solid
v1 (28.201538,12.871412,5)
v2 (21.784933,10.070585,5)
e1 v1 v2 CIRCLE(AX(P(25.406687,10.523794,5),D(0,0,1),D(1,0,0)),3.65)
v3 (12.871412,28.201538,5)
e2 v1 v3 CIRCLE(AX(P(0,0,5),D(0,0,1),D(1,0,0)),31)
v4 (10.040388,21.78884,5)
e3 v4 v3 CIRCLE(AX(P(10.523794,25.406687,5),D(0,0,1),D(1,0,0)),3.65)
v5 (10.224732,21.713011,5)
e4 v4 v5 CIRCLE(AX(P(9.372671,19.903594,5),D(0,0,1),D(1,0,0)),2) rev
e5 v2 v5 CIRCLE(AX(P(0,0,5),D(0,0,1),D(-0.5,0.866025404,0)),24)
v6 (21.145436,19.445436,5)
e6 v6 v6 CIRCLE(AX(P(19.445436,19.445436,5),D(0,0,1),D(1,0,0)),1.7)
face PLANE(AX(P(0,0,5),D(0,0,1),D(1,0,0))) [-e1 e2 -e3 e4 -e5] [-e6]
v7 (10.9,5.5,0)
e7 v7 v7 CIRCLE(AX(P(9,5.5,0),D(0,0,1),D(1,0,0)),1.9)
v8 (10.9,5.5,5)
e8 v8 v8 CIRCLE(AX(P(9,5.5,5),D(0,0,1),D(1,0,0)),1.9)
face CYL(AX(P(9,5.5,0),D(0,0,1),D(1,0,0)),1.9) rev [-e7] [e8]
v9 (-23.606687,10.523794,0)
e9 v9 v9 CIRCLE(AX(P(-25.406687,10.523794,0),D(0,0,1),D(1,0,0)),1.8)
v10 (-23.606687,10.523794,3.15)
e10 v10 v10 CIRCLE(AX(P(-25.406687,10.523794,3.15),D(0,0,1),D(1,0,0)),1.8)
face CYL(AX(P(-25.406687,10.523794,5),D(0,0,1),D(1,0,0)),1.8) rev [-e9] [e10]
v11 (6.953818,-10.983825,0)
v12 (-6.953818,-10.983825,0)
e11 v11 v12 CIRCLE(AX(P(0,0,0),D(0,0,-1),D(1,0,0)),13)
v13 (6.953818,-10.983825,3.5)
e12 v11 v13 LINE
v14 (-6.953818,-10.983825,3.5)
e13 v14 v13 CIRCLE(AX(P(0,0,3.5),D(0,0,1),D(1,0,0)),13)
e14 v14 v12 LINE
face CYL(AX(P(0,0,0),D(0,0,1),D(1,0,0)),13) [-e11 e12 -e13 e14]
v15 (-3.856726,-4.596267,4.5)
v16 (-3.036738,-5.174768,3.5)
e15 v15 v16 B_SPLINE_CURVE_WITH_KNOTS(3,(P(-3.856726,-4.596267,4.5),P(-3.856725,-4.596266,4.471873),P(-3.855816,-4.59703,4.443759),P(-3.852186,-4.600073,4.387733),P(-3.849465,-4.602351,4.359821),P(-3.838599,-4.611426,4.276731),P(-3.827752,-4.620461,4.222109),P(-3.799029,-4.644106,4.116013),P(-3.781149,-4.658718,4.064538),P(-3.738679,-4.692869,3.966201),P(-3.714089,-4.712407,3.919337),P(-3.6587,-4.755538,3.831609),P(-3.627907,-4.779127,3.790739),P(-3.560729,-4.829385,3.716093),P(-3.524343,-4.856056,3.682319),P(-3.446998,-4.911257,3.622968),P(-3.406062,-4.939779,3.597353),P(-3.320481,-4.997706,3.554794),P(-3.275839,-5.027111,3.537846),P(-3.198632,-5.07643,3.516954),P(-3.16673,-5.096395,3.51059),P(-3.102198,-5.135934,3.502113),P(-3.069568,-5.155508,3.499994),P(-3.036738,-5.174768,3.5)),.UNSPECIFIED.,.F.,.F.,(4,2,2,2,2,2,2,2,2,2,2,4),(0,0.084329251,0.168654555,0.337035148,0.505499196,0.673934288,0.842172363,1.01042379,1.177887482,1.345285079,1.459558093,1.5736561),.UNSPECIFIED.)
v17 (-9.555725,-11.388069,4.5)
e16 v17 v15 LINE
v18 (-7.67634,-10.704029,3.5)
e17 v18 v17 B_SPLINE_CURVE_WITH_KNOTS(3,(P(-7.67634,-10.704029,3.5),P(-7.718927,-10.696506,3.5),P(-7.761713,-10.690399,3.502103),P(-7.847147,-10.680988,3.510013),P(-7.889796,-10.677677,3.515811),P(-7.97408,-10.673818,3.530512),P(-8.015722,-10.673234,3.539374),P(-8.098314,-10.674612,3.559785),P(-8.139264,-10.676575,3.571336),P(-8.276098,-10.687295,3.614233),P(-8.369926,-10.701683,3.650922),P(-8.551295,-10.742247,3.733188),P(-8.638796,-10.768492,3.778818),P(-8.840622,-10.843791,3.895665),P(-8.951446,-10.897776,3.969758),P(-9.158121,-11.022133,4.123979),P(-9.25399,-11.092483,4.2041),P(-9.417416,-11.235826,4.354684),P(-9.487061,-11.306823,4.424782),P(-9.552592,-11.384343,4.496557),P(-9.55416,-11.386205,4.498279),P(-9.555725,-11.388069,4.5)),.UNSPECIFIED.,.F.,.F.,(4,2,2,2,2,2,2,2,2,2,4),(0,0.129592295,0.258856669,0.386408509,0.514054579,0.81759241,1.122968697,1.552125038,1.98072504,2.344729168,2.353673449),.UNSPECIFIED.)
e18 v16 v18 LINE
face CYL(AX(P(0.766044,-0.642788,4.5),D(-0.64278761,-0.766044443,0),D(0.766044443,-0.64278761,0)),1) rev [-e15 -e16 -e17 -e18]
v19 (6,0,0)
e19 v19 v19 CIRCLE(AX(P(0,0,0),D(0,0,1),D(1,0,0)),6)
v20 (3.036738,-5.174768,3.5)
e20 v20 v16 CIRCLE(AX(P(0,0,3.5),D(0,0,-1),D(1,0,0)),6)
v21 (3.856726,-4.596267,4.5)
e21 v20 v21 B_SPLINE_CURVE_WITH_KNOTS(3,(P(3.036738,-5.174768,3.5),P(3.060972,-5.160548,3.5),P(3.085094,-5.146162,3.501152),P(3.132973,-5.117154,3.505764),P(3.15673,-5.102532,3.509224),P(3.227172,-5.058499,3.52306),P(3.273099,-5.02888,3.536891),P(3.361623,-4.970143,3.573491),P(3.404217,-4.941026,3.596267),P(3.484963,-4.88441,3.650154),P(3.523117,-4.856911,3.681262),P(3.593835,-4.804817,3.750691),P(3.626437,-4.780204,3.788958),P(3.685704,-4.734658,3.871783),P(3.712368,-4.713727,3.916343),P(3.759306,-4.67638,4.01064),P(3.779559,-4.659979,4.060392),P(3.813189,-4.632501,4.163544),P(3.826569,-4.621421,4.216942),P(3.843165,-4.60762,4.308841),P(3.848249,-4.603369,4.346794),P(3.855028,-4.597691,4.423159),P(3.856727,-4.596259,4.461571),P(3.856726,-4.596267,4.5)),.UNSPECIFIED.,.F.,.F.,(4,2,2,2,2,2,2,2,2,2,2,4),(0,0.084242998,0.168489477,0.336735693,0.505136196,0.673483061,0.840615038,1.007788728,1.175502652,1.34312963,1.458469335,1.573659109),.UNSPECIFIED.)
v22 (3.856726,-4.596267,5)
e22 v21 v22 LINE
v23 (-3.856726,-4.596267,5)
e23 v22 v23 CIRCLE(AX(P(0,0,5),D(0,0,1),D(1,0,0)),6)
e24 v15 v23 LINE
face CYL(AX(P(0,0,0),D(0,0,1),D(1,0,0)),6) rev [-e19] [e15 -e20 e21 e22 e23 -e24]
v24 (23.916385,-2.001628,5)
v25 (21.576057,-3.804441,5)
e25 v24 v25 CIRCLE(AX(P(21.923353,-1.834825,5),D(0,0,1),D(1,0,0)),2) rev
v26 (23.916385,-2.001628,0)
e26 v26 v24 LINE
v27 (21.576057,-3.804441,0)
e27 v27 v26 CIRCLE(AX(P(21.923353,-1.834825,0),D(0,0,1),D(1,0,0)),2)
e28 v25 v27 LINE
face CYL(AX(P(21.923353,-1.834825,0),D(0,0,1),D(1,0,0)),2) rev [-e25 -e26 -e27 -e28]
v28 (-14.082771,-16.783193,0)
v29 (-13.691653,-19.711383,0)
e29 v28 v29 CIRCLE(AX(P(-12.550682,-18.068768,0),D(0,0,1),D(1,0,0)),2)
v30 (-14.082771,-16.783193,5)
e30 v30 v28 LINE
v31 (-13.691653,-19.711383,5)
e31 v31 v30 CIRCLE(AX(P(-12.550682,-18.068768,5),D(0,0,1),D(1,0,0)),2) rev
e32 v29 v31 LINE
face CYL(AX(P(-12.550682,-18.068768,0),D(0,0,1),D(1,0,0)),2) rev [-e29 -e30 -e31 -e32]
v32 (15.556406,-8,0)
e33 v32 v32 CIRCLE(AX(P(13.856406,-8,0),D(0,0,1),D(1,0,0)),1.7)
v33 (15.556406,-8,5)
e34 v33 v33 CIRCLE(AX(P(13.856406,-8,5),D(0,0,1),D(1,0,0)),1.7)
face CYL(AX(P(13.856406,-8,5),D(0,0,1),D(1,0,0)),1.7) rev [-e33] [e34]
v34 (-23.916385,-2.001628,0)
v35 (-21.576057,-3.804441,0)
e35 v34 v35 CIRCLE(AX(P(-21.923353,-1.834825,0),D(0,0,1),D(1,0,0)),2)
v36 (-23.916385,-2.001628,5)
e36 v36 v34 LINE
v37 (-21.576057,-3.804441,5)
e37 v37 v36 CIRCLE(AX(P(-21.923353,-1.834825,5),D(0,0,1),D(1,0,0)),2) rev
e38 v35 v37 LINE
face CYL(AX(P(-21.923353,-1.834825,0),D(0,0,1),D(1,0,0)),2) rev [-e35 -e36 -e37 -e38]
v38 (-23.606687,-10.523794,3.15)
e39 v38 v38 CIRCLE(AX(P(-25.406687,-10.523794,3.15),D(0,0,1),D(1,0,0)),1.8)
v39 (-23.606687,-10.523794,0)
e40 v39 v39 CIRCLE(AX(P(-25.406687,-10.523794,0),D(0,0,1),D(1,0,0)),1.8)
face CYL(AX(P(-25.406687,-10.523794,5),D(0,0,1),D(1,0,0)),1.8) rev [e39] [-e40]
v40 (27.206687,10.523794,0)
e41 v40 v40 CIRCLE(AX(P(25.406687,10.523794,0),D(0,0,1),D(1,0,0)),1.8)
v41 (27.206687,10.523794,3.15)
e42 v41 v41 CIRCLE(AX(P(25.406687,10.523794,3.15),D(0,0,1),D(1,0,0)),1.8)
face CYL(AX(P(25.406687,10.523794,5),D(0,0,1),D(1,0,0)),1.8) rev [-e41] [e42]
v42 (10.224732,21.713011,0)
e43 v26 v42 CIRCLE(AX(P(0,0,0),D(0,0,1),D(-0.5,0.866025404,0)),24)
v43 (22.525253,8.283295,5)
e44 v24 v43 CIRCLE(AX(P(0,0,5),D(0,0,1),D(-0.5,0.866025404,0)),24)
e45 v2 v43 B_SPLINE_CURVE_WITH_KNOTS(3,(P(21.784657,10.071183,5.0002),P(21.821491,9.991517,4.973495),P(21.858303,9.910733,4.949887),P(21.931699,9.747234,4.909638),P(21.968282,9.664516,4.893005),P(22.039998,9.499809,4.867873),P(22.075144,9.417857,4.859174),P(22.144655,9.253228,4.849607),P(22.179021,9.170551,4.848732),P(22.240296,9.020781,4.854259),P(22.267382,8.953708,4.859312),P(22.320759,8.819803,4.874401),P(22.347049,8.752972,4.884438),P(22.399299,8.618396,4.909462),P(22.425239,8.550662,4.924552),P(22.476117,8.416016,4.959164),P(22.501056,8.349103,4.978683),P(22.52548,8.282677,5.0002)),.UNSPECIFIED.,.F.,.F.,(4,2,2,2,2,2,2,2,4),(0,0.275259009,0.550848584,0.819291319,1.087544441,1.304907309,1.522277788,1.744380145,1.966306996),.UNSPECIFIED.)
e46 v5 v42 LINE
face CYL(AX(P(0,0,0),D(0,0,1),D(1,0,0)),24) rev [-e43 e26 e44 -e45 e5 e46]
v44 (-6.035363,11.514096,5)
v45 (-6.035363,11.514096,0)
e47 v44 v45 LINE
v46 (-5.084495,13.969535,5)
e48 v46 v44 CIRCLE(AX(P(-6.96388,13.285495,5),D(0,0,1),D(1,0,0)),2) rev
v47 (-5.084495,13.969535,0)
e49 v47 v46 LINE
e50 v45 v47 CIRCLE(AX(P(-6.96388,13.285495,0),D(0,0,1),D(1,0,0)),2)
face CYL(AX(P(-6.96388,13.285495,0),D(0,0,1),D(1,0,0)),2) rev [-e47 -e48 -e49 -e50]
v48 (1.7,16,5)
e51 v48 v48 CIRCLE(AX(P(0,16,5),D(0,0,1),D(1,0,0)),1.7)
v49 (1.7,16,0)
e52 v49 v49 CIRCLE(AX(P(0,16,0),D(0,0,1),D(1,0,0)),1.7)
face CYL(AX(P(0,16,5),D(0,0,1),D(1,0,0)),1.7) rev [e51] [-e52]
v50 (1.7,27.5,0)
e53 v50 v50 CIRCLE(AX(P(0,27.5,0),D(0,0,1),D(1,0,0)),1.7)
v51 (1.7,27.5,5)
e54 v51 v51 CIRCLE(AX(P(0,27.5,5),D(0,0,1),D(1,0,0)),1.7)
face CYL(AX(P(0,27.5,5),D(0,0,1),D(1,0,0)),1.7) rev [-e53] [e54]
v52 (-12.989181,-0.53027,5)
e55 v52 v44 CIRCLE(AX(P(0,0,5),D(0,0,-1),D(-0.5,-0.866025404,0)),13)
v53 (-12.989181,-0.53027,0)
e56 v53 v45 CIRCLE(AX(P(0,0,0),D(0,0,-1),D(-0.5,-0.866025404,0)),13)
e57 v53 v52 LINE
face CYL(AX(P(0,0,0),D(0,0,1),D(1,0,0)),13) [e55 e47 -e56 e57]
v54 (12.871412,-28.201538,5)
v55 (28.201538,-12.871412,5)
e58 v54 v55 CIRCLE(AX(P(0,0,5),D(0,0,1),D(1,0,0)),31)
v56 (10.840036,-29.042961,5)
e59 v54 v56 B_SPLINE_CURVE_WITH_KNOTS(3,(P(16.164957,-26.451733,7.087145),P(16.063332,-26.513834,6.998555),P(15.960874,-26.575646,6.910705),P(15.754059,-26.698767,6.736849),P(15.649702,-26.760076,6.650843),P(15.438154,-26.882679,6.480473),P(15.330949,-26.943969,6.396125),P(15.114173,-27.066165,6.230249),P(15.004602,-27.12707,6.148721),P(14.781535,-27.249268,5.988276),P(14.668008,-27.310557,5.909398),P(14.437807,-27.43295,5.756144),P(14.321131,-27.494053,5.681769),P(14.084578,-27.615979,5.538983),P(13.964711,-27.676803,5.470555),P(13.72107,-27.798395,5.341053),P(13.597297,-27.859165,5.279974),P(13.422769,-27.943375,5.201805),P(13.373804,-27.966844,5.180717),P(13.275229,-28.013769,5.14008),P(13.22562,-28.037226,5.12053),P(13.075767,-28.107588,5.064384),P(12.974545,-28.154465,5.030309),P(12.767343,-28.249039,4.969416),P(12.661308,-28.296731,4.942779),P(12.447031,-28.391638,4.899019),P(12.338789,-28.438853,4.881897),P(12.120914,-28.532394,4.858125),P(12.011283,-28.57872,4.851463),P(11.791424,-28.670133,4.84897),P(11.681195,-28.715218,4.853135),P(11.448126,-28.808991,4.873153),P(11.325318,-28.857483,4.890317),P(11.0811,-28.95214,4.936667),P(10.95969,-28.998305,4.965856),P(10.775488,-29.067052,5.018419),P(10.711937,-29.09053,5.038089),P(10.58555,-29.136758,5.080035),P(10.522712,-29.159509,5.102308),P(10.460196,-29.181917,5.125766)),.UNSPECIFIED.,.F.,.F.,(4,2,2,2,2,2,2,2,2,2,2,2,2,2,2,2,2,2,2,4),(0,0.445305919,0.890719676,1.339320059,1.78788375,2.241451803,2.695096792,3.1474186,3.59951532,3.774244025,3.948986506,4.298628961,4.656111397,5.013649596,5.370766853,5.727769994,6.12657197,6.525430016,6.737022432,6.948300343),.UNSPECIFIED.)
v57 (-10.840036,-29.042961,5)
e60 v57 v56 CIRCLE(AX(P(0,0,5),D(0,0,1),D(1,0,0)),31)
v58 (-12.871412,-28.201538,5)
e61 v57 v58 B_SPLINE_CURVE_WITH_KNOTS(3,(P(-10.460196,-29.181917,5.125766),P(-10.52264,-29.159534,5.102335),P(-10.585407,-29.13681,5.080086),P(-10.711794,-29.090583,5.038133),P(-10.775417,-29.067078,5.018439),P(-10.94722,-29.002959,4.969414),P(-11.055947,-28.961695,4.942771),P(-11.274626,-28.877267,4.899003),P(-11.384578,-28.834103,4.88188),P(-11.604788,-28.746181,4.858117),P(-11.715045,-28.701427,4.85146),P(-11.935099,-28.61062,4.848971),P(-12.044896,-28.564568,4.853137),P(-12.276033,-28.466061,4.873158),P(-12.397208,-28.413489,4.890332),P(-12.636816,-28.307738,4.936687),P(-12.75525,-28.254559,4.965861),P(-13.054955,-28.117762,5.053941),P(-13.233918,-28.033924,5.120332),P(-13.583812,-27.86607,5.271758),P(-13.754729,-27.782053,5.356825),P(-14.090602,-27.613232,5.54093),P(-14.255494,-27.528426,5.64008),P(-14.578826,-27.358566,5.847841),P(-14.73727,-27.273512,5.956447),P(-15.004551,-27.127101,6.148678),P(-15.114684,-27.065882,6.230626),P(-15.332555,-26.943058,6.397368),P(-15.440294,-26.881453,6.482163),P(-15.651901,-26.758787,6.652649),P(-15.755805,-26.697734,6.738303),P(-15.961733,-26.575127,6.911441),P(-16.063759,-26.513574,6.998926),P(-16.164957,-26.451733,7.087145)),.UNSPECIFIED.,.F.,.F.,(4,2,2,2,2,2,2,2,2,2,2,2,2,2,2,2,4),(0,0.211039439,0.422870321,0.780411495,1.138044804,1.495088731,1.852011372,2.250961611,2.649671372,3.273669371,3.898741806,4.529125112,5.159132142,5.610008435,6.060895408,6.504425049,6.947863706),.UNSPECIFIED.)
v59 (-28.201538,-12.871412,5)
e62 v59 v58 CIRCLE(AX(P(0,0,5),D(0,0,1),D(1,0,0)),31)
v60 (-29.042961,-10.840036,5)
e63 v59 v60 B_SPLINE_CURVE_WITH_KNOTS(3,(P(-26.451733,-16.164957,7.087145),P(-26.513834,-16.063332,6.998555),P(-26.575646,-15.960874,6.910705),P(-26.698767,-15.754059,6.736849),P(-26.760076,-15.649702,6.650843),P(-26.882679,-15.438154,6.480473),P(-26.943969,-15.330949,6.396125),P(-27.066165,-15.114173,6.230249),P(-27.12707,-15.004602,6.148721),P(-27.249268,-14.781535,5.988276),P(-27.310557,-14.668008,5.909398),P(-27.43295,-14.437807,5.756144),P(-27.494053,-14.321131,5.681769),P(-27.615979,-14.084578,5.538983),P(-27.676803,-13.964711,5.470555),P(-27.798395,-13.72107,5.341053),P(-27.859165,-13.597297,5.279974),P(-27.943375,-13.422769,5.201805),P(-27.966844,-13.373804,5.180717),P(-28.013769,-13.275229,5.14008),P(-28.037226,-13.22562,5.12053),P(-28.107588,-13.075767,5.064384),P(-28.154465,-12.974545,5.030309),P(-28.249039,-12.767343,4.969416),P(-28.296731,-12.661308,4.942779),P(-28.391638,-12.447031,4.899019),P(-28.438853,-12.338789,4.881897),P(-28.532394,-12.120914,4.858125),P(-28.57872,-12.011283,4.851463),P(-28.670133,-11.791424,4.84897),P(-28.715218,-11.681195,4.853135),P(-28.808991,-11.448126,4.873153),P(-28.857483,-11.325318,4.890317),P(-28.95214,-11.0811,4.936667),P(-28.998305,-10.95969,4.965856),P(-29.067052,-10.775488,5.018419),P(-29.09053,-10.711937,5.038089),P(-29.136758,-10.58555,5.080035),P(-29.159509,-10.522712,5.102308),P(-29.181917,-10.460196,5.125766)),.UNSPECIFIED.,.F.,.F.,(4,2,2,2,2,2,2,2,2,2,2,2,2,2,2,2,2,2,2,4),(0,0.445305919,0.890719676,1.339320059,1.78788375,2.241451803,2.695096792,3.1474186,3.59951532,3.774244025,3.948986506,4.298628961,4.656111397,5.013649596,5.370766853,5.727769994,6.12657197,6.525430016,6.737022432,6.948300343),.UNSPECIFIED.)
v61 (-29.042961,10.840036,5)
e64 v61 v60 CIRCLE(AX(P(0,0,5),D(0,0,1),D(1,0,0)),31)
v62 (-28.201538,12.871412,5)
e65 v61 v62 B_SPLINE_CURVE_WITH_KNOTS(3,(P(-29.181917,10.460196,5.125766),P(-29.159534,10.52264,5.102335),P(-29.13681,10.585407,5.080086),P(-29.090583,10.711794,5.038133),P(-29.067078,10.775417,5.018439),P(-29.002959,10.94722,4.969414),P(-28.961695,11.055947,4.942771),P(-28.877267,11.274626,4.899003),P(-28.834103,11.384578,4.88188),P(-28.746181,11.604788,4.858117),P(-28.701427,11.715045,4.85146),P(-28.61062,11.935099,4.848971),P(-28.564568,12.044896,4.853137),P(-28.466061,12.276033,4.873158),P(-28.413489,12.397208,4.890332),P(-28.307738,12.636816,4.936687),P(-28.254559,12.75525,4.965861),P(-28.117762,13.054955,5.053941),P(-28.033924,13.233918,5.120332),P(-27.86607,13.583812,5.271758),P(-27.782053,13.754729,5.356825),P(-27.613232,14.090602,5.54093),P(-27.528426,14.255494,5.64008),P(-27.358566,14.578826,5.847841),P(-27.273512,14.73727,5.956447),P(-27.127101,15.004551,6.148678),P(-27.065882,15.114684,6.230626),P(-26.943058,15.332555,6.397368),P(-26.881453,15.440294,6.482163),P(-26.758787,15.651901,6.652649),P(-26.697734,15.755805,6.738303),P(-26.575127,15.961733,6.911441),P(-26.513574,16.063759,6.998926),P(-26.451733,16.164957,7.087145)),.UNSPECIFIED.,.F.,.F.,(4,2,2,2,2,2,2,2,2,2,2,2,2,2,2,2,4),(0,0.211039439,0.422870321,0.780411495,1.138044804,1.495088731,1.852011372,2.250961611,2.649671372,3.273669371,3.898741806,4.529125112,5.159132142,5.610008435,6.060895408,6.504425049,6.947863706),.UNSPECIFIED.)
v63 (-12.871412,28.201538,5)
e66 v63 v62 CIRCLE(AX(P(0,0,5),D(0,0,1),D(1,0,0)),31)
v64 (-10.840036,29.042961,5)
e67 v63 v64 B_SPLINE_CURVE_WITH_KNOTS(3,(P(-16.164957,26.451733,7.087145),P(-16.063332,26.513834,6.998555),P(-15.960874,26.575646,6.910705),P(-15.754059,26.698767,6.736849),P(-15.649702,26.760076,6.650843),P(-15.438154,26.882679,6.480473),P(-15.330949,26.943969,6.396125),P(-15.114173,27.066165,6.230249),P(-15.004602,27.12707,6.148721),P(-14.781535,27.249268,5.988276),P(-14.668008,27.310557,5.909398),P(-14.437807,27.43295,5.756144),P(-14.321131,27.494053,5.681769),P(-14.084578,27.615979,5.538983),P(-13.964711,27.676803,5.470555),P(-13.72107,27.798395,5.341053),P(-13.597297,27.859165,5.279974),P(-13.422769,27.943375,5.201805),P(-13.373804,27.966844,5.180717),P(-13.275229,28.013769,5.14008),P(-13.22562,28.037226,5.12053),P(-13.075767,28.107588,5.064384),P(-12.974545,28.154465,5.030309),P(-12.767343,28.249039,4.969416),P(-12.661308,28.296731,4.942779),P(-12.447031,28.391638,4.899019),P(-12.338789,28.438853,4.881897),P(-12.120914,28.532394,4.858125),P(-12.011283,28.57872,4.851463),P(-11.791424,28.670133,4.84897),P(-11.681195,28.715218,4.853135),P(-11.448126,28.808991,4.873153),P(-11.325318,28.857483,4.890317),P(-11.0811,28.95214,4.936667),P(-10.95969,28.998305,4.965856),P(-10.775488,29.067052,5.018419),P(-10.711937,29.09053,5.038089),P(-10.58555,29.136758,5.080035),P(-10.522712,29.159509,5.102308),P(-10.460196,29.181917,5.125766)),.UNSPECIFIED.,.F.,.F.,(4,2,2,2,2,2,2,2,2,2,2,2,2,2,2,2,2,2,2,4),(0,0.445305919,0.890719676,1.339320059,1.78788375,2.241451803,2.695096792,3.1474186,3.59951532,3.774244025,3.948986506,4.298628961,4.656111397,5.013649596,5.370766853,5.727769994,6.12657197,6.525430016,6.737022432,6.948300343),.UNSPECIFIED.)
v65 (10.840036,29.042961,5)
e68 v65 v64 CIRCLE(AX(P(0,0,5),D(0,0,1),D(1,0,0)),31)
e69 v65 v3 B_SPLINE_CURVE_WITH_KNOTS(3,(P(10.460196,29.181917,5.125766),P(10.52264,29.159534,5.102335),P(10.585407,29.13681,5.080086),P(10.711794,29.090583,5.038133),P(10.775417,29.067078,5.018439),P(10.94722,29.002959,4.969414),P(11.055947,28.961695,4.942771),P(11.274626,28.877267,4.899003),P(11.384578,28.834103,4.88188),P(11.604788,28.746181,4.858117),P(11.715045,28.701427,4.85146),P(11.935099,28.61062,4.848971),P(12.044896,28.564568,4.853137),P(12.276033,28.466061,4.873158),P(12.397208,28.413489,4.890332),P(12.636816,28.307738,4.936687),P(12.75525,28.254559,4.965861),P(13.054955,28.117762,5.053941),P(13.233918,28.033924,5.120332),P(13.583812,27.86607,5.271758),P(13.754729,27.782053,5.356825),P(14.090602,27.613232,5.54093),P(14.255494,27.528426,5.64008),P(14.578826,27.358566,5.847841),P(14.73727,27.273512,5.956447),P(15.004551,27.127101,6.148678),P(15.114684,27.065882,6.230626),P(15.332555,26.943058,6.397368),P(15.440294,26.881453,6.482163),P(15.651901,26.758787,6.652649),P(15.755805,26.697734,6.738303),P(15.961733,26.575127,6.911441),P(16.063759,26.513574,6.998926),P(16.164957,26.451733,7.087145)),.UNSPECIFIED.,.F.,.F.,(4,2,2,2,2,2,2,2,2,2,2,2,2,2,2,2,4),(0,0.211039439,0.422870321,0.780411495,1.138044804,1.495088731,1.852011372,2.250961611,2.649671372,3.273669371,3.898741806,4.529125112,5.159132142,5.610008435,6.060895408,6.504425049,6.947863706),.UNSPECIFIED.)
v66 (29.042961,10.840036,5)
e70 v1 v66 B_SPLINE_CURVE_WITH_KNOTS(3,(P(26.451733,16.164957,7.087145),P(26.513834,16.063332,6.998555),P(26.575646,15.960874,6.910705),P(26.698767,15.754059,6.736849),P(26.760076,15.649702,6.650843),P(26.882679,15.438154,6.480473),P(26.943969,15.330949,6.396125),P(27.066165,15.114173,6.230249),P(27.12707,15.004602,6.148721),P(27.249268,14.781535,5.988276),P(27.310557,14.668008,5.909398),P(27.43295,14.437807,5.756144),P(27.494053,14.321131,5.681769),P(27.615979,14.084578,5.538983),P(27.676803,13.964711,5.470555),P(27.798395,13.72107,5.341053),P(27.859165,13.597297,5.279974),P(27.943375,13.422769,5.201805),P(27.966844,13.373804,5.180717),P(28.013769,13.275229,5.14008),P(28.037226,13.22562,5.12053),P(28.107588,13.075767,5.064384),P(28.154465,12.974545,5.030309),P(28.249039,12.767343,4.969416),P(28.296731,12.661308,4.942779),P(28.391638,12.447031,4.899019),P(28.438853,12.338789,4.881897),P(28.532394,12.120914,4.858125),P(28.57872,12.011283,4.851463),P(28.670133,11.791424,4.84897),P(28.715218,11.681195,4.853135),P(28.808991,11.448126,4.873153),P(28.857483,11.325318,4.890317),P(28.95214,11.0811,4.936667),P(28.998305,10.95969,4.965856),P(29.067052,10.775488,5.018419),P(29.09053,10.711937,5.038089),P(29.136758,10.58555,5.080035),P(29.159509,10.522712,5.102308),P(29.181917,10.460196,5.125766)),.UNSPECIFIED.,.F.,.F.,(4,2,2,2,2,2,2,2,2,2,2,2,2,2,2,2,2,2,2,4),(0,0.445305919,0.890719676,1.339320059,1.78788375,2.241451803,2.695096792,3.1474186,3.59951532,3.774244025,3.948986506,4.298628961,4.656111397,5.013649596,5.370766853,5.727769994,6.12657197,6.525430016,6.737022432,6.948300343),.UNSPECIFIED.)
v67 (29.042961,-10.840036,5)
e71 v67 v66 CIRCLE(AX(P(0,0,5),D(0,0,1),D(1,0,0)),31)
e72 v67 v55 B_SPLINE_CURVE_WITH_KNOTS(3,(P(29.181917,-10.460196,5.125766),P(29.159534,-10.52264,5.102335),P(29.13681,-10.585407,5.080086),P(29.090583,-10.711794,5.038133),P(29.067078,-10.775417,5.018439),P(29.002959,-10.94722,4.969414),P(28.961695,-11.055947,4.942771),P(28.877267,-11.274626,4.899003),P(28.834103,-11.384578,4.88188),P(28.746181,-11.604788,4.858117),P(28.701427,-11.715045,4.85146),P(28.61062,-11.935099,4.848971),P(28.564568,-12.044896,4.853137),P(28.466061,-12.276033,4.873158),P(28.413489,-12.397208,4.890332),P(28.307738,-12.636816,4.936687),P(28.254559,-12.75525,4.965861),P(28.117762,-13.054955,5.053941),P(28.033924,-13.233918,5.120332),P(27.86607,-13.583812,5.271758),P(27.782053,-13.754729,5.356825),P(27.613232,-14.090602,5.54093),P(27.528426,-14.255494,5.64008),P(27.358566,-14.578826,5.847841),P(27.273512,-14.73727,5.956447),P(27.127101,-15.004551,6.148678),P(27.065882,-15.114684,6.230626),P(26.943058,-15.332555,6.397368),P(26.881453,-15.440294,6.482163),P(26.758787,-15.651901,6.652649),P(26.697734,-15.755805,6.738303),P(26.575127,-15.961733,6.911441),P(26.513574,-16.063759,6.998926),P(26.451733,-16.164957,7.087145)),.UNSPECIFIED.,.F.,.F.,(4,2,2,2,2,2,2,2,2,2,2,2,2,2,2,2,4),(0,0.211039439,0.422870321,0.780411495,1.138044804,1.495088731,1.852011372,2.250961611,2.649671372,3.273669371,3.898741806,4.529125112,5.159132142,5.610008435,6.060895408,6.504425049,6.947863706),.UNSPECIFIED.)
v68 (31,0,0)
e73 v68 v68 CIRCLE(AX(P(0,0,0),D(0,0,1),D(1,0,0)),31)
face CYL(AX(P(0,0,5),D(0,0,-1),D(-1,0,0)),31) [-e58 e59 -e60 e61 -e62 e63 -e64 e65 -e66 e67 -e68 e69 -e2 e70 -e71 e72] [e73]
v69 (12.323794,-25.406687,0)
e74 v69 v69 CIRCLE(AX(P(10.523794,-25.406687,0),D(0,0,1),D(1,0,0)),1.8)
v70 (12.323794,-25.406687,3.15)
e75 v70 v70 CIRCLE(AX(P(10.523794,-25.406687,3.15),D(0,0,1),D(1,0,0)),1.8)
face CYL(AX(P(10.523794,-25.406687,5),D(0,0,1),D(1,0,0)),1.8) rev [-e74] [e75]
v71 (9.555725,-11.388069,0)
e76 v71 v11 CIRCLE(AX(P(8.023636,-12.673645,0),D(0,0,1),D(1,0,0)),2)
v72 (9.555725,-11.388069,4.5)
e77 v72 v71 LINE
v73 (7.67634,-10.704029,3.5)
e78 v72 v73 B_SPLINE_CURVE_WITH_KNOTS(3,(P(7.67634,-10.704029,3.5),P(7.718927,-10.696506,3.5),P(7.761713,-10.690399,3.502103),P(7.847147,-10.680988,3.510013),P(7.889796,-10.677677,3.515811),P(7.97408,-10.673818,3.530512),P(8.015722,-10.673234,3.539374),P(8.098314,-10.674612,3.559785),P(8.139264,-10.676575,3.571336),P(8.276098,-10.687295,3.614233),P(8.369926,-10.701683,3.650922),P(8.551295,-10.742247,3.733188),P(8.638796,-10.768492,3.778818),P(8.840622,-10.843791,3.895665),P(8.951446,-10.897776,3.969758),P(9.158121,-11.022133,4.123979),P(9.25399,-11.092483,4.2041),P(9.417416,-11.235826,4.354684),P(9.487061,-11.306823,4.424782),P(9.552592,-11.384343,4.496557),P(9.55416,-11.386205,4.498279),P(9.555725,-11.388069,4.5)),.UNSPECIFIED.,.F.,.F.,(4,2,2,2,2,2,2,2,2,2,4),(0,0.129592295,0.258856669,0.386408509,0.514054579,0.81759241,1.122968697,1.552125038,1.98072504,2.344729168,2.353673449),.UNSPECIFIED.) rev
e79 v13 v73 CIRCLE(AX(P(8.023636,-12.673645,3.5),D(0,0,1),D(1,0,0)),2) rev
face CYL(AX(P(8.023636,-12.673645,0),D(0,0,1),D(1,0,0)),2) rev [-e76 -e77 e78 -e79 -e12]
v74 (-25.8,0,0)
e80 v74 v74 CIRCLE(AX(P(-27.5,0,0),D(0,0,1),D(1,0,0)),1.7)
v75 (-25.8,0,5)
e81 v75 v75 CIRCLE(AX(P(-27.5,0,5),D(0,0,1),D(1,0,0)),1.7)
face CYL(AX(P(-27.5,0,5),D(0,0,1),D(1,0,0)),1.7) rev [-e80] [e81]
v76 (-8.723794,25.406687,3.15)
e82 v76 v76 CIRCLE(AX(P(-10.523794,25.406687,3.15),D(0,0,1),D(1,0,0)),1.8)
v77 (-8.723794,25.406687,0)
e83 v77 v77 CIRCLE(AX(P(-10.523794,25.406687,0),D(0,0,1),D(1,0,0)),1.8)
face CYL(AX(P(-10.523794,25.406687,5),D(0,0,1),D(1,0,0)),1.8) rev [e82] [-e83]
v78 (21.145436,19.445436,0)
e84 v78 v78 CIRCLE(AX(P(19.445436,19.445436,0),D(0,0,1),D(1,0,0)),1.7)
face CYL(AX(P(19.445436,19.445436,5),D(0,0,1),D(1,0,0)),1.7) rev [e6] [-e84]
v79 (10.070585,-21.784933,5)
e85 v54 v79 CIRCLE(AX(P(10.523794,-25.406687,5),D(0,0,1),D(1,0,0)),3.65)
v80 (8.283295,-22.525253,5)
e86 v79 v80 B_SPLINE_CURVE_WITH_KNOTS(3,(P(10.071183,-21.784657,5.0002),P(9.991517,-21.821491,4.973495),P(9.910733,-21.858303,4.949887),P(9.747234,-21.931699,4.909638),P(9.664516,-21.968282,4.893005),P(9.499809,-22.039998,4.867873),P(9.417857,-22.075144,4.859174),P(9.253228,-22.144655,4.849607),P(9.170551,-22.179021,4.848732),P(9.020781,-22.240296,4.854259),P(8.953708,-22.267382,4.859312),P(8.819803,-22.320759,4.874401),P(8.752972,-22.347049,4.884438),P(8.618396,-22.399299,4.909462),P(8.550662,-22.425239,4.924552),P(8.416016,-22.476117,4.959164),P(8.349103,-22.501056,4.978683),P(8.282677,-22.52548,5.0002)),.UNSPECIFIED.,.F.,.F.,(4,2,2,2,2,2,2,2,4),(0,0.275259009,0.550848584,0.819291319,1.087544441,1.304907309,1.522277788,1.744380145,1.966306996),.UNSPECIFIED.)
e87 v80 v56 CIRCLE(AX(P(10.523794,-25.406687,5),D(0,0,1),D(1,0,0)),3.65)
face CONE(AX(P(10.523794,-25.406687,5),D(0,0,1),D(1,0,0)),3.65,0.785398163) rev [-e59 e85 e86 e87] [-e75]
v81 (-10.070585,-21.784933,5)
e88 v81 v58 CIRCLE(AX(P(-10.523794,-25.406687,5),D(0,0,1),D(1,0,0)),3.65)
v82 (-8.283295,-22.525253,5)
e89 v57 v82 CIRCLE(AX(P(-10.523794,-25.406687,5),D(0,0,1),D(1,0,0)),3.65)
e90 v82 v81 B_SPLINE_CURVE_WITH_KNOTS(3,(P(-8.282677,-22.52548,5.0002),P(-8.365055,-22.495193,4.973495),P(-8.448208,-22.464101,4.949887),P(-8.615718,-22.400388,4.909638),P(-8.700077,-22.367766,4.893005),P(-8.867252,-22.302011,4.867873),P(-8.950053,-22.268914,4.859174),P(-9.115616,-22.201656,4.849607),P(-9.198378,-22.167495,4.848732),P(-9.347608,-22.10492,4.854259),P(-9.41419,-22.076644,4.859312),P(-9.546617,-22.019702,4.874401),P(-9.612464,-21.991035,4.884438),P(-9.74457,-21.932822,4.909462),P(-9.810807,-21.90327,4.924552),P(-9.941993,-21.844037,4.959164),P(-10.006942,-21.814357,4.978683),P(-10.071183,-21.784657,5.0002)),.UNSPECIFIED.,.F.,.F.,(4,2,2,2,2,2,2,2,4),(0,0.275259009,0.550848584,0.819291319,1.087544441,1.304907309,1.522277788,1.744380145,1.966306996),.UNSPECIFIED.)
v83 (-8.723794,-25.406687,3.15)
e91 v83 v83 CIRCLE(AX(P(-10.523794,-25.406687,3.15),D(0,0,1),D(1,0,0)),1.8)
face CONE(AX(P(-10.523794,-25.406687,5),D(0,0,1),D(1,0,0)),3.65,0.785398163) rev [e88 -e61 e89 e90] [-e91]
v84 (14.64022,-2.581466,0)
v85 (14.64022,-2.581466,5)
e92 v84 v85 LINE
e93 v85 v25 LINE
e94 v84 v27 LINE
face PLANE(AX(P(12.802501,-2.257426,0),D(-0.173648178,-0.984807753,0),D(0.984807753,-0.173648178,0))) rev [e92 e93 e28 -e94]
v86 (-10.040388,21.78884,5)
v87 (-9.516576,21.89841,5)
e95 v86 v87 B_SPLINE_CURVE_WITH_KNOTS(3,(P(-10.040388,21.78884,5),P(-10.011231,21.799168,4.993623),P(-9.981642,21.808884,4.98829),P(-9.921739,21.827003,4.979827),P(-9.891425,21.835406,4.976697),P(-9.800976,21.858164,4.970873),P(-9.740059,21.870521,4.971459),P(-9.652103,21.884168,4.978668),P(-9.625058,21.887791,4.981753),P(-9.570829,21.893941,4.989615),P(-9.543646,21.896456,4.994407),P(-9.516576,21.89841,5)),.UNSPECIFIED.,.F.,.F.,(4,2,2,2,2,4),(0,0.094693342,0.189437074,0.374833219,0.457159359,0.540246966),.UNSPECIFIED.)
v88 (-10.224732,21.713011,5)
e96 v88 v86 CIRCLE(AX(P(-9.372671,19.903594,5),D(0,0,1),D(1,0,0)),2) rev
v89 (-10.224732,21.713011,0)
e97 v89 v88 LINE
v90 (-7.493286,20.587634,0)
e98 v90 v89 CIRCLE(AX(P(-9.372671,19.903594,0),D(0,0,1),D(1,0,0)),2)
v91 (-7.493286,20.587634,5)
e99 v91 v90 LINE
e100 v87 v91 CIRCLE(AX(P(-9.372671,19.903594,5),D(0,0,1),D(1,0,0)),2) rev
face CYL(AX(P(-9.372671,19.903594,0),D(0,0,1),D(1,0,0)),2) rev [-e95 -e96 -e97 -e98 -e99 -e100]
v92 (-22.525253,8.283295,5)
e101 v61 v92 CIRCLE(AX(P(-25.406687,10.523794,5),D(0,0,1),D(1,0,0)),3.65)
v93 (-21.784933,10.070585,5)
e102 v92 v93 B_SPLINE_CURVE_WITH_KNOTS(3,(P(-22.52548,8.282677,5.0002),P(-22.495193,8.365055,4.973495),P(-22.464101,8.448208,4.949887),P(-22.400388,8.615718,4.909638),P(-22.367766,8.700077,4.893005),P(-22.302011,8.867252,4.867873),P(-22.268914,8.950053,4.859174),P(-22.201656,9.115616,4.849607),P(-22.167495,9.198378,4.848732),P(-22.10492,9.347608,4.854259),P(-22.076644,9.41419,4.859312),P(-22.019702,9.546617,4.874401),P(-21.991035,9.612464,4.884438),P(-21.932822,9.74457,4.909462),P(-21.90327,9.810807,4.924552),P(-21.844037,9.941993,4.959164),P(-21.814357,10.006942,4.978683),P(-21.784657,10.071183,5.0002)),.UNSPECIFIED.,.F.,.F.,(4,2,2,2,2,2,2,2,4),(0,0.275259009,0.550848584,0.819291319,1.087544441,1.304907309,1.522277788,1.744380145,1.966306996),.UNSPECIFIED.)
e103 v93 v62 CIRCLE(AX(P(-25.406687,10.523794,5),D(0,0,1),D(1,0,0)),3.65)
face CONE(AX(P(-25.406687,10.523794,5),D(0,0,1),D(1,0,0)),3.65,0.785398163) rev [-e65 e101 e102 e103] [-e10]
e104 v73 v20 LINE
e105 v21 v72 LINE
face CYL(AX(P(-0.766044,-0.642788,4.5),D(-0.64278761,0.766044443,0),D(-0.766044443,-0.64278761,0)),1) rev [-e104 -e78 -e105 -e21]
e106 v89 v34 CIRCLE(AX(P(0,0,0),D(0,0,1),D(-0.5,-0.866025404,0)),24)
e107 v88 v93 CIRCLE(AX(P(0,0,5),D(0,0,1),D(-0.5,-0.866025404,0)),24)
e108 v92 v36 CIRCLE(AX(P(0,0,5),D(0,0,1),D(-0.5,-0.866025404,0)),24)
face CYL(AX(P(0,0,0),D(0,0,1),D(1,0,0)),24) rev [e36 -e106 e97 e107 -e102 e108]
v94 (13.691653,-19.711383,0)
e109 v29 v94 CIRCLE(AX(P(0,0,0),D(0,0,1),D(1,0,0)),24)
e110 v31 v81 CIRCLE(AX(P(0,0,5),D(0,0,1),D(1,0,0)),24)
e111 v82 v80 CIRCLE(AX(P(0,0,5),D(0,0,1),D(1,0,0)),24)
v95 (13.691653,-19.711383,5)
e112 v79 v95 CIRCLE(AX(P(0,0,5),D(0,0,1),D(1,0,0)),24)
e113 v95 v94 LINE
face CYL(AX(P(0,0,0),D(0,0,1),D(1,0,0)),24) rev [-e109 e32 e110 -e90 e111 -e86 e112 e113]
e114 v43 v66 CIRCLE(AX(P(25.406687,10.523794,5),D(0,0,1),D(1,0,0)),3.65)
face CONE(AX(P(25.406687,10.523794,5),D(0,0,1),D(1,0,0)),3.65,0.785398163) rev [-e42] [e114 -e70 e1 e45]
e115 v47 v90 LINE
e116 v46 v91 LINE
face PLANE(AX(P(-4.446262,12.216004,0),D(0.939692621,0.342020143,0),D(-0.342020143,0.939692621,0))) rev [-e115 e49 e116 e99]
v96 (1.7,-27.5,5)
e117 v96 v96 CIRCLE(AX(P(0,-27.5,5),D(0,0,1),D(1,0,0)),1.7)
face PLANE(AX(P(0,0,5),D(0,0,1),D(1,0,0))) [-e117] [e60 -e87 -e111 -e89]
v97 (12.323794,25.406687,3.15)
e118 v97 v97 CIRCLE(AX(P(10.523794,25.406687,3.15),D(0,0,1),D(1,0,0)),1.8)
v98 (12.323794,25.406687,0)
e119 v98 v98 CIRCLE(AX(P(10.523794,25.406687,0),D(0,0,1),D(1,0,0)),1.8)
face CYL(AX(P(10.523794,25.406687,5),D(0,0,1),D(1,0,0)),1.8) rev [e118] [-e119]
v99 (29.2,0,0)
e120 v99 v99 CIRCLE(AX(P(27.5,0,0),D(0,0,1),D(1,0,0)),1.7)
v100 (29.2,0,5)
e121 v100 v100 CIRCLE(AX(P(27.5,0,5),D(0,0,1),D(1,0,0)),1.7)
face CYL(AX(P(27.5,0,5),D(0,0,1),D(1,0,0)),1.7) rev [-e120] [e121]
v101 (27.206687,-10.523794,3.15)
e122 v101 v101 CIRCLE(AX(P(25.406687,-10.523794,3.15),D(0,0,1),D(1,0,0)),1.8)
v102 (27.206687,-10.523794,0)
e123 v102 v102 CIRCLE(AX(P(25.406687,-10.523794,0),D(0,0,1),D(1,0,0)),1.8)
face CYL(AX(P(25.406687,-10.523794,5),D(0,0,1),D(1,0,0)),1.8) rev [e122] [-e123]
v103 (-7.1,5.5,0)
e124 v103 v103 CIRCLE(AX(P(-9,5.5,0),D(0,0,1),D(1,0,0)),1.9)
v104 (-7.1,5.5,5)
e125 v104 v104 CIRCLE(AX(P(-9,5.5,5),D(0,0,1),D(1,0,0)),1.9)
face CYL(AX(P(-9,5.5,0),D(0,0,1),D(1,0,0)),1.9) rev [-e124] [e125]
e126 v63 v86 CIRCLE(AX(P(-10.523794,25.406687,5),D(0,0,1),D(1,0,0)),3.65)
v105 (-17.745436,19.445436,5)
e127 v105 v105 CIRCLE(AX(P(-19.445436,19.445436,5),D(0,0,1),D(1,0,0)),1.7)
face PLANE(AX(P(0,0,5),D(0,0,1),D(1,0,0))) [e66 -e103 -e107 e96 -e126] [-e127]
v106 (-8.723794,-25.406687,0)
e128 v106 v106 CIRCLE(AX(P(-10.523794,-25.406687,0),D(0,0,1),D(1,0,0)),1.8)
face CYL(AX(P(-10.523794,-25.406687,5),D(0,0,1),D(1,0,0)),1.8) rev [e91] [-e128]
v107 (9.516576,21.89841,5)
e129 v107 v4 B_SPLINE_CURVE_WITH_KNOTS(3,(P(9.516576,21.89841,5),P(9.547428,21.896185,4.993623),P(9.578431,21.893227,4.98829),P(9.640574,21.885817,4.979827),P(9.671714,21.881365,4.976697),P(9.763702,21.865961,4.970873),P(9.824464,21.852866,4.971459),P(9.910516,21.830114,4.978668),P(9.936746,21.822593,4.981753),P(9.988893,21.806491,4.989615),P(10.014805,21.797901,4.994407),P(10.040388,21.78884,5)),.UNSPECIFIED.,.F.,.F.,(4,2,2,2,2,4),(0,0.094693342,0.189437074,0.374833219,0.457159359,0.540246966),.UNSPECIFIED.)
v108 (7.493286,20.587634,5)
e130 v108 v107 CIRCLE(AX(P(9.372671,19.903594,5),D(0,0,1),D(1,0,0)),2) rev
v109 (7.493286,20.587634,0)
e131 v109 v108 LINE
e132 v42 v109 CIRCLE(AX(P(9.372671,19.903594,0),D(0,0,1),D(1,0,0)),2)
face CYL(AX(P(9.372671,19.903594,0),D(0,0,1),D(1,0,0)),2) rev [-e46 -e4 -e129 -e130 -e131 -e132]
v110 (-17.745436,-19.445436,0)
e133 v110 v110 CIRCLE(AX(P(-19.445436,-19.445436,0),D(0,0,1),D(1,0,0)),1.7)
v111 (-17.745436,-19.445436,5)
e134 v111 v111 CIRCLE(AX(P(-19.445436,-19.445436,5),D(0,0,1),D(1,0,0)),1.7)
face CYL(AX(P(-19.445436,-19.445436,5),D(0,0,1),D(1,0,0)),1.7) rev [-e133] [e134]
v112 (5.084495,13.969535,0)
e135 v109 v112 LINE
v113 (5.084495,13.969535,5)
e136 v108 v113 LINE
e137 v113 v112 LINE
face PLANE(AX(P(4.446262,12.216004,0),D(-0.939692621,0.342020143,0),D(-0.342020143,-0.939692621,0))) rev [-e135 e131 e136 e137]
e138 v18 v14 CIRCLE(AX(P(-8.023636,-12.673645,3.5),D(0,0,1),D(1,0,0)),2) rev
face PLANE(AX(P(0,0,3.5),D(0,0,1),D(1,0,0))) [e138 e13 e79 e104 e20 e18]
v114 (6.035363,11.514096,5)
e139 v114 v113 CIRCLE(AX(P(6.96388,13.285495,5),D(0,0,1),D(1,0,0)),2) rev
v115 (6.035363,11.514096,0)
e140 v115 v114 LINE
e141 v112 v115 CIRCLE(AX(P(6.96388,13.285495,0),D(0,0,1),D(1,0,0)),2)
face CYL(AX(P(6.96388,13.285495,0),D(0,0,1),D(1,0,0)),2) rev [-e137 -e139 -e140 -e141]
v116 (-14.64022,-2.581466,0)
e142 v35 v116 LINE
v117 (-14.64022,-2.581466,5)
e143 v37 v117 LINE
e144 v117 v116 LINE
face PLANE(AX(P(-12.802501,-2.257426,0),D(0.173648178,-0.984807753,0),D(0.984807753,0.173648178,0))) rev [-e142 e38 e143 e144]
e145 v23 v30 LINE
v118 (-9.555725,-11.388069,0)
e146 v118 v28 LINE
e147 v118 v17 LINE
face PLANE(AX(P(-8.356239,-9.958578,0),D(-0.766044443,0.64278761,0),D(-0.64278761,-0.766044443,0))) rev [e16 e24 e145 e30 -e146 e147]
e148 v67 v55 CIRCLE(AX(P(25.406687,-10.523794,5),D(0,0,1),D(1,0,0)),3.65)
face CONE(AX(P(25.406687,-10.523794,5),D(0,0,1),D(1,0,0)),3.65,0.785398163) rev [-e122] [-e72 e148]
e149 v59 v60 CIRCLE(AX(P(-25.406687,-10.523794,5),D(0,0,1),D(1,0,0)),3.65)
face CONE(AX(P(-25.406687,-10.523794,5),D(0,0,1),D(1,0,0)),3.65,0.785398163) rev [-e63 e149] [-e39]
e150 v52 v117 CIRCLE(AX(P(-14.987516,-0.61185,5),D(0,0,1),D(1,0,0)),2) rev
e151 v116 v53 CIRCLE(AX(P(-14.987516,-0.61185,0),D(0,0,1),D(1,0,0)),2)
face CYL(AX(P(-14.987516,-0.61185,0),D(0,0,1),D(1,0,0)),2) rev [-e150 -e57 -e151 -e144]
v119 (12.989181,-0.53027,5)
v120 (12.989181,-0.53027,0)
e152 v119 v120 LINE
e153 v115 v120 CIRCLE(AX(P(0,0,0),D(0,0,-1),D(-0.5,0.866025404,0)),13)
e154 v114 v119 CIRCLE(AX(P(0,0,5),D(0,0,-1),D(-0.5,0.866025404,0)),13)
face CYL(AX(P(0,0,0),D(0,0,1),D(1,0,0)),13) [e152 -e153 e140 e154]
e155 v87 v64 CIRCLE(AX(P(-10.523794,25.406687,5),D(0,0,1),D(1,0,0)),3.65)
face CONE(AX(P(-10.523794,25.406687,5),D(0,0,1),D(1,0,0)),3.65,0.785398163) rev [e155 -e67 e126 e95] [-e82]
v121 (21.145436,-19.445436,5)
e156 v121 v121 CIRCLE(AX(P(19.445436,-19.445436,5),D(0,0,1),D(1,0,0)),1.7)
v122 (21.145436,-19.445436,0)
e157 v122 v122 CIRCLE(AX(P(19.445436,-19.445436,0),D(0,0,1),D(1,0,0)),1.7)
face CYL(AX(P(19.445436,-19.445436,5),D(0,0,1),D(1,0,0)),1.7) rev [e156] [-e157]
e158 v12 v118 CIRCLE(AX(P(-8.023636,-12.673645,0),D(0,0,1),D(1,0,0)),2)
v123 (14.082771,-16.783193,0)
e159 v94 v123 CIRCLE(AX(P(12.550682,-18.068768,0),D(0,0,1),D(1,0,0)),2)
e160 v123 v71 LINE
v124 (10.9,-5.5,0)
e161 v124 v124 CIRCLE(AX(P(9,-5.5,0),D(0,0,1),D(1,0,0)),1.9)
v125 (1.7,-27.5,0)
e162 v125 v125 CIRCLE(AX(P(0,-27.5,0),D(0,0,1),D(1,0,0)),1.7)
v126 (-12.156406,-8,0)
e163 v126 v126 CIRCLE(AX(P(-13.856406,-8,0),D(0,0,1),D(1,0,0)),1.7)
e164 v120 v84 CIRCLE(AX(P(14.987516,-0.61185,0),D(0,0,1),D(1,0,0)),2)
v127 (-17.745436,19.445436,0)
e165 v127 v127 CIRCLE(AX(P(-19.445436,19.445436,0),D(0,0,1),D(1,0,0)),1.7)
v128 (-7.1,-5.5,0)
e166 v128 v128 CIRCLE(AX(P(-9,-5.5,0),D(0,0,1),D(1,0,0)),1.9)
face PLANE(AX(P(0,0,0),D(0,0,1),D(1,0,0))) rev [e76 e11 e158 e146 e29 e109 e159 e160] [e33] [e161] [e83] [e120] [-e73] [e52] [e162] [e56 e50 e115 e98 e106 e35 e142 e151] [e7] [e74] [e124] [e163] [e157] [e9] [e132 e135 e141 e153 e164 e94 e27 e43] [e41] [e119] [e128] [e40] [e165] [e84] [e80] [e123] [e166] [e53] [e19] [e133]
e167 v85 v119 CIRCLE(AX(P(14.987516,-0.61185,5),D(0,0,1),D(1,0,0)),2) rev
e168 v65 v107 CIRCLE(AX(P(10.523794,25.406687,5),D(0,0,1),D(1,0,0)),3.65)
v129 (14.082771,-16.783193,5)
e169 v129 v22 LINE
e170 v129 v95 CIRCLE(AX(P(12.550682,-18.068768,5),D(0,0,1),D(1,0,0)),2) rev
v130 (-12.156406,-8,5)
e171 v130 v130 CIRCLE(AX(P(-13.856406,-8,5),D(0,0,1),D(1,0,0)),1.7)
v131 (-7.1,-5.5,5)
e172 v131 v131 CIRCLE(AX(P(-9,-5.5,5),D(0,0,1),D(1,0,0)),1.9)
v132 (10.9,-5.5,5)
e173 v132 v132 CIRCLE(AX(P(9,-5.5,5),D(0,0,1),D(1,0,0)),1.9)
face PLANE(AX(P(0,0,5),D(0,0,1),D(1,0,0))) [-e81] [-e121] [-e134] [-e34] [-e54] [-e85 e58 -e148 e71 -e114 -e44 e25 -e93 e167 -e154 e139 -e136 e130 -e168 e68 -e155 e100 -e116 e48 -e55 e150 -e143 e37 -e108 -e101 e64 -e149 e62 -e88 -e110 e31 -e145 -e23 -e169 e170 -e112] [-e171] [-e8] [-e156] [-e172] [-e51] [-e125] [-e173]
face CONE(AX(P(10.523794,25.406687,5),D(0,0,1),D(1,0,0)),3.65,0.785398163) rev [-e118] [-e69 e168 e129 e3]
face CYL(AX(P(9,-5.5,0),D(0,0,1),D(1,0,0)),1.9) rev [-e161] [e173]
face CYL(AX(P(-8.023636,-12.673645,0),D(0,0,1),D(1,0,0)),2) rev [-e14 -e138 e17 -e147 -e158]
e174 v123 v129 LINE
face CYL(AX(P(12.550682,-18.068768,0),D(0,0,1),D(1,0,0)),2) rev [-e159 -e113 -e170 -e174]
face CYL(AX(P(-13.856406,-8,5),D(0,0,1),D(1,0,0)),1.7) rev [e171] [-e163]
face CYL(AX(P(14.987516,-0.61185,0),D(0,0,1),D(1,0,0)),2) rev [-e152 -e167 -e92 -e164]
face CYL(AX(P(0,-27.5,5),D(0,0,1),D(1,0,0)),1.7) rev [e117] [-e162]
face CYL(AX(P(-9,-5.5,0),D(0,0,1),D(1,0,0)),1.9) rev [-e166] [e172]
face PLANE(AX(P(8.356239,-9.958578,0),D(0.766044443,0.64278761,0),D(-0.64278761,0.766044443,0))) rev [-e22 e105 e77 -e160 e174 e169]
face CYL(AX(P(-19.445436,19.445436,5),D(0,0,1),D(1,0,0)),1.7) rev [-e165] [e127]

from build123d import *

# Parameters (mm, degrees)
SKETCH_1_R                     = 30.999999999999996
EXTRUDE_1_DEPTH                = 5
SKETCH_2_R                     = 6
CUT_EXTRUDE_1_DEPTH            = 45.12482294582041
HOLE_WIZARD_M3_1_D             = 3.4
HOLE_WIZARD_M3_1_2_D           = 3.6
HOLE_WIZARD_M3_1_2_CSINK_D     = 7.3
HOLE_WIZARD_M3_1_2_CSINK_ANGLE = 90
PATTERN_CIRCULAR_1_COUNT       = 8
HOLE_WIZARD_M3_2_D             = 3.4
PATTERN_CIRCULAR_2_COUNT       = 3
CUT_EXTRUDE_4_DEPTH            = 45.124823097662386
FILLET_1_R                     = 2
PATTERN_CIRCULAR_5_DEPTH       = 5
SKETCH_13_R                    = 1.9
SKETCH_13_R_2                  = 1.8999999999999984
CUT_EXTRUDE_5_DEPTH            = 45.124823097662386
CUT_EXTRUDE_6_DEPTH            = 1.5
FILLET_2_R                     = 1


# Read off the part's stored shape, not the designer's step: 円形ﾊﾟﾀｰﾝ5
with BuildPart() as part:
    # ｽｹｯﾁ1 → ﾎﾞｽ - 押し出し1 (new body)
    with BuildSketch(Plane.XY):
        Circle(SKETCH_1_R)
    extrude(amount=EXTRUDE_1_DEPTH)

    # ｽｹｯﾁ2 → ｶｯﾄ - 押し出し1 (cut, through all)
    with BuildSketch(Plane.XY.offset(5)):
        Circle(SKETCH_2_R)
    extrude(amount=-CUT_EXTRUDE_1_DEPTH, mode=Mode.SUBTRACT)

    # Hole Wizard M3 _1 (through all)
    with Locations(Plane.XY.offset(5)):
        with Locations((0, 27.5)):
            hole_wizard_m3_1 = Hole(HOLE_WIZARD_M3_1_D / 2)

    # Hole Wizard M3 _1 2 (through all)
    with Locations(Plane.XY.offset(5)):
        with Locations((10.52379439, 25.406687144)):
            hole_wizard_m3_1_2 = CounterSinkHole(HOLE_WIZARD_M3_1_2_D / 2, HOLE_WIZARD_M3_1_2_CSINK_D / 2, counter_sink_angle=HOLE_WIZARD_M3_1_2_CSINK_ANGLE)

    # 円形ﾊﾟﾀｰﾝ1: Hole Wizard M3 _1, Hole Wizard M3 _1 2 ×8 about axis
    pattern_circular_1_axis = Axis((-2.28e-14, 6.09e-15, 0), (0, 0, 1))
    add([hole_wizard_m3_1.rotate(pattern_circular_1_axis, i * 360 / PATTERN_CIRCULAR_1_COUNT) for i in range(1, PATTERN_CIRCULAR_1_COUNT)], mode=Mode.SUBTRACT)
    add([hole_wizard_m3_1_2.rotate(pattern_circular_1_axis, i * 360 / PATTERN_CIRCULAR_1_COUNT) for i in range(1, PATTERN_CIRCULAR_1_COUNT)], mode=Mode.SUBTRACT)

    # M3 すきま穴2 (through all)
    with Locations(Plane.XY.offset(5)):
        with Locations((0, 16)):
            hole_wizard_m3_2 = Hole(HOLE_WIZARD_M3_2_D / 2)

    # 円形ﾊﾟﾀｰﾝ2: M3 すきま穴2 ×3 about axis
    pattern_circular_2_axis = Axis((6.2e-16, -9.3e-16, 0), (0, 0, 1))
    for i in range(1, PATTERN_CIRCULAR_2_COUNT):
        add(hole_wizard_m3_2.rotate(pattern_circular_2_axis, i * 360 / PATTERN_CIRCULAR_2_COUNT), mode=Mode.SUBTRACT)

    # ｽｹｯﾁ12 → ｶｯﾄ - 押し出し4 (cut, through all)
    with BuildSketch(Plane.XY.offset(5)):
        with BuildLine():
            Line((-8.356238925925028, -9.958577760546698), (-15.42690263247697, -18.38506663485545))
            ThreePointArc((-15.42690263247697, -18.38506663485545), (1.036e-14, -23.999999999999986), (15.426902632476974, -18.38506663485544))
            Line((15.426902632476974, -18.38506663485544), (8.356238925925028, -9.958577760546694))
            ThreePointArc((8.356238925925028, -9.958577760546694), (8e-16, -12.999999999999998), (-8.356238925925028, -9.958577760546698))
        make_face()
    extrude(amount=-CUT_EXTRUDE_4_DEPTH, mode=Mode.SUBTRACT)

    # ﾌｨﾚｯﾄ1
    fillet_1_edges = [part.edges().sort_by_distance(p)[0] for p in [
        (15.426902632476974, -18.38506663485544, 2.5),
        (-15.42690263247697, -18.38506663485545, 2.5),
        (-8.35623892592503, -9.9585777605467, 2.5),
        (8.35623892592503, -9.958577760546696, 2.5),
    ]]
    fillet(fillet_1_edges, radius=FILLET_1_R)

    # 円形ﾊﾟﾀｰﾝ5 outline → 円形ﾊﾟﾀｰﾝ5 (cut)
    with BuildSketch(Plane.XY):
        with BuildLine():
            ThreePointArc((21.576056845, -3.804440959), (23.143863501, -3.419235313), (23.91638531, -2.001627767))
            ThreePointArc((23.91638531, -2.001627767), (20.784609691, 12), (10.22473216, 21.713011128))
            ThreePointArc((10.22473216, 21.713011128), (8.610787108, 21.752791391), (7.493285905, 20.587633821))
            Line((7.493285905, 20.587633821), (5.084494964, 13.969535102))
            ThreePointArc((5.084494964, 13.969535102), (5.098839949, 12.563258813), (6.035362845, 11.514095507))
            ThreePointArc((6.035362845, 11.514095507), (11.258330249, 6.5), (12.989180633, -0.530270209))
            ThreePointArc((12.989180633, -0.530270209), (13.429521261, -1.865904481), (14.640219759, -2.581465747))
            Line((14.640219759, -2.581465747), (21.576056845, -3.804440959))
        make_face()
        with BuildLine():
            ThreePointArc((-7.493285905, 20.587633821), (-8.610787108, 21.752791391), (-10.22473216, 21.713011128))
            ThreePointArc((-10.22473216, 21.713011128), (-20.784609691, 12), (-23.91638531, -2.001627767))
            ThreePointArc((-23.91638531, -2.001627767), (-23.143863501, -3.419235313), (-21.576056845, -3.804440959))
            Line((-21.576056845, -3.804440959), (-14.640219759, -2.581465747))
            ThreePointArc((-14.640219759, -2.581465747), (-13.429521261, -1.865904481), (-12.989180633, -0.530270209))
            ThreePointArc((-12.989180633, -0.530270209), (-11.258330249, 6.5), (-6.035362845, 11.514095507))
            ThreePointArc((-6.035362845, 11.514095507), (-5.098839949, 12.563258813), (-5.084494964, 13.969535102))
            Line((-5.084494964, 13.969535102), (-7.493285905, 20.587633821))
        make_face()
    extrude(amount=PATTERN_CIRCULAR_5_DEPTH, mode=Mode.SUBTRACT)

    # ｽｹｯﾁ13 → ｶｯﾄ - 押し出し5 (cut, through all)
    with BuildSketch(Plane.XY.offset(5)):
        with Locations((-8.999999999999998, 5.499999999999997)):
            Circle(SKETCH_13_R)
        with Locations((9.000000000000002, 5.499999999999997)):
            Circle(SKETCH_13_R_2)
        with Locations((-8.999999999999998, -5.500000000000003)):
            Circle(SKETCH_13_R)
        with Locations((9.000000000000002, -5.500000000000003)):
            Circle(SKETCH_13_R_2)
    extrude(amount=-CUT_EXTRUDE_5_DEPTH, mode=Mode.SUBTRACT)

    # ｽｹｯﾁ14 → ｶｯﾄ - 押し出し6 (cut)
    with BuildSketch(Plane.XY.offset(5)):
        with BuildLine():
            Line((-9.555724795524648, -11.388069354908032), (-3.8567256581192475, -4.596266658713859))
            ThreePointArc((-3.8567256581192475, -4.596266658713859), (3.7e-16, -6.000000000000001), (3.8567256581192484, -4.59626665871386))
            Line((3.8567256581192484, -4.59626665871386), (9.55572479552465, -11.38806935490803))
            ThreePointArc((9.55572479552465, -11.38806935490803), (9.1e-16, -14.866068747318506), (-9.555724795524648, -11.388069354908032))
        make_face()
    extrude(amount=-CUT_EXTRUDE_6_DEPTH, mode=Mode.SUBTRACT)

    # ﾌｨﾚｯﾄ2
    fillet_2_edges = [part.edges().sort_by_distance(p)[0] for p in [
        (-6.706225226821948, -7.992168006810946, 3.5),
        (6.7062252268219495, -7.992168006810945, 3.5),
    ]]
    fillet(fillet_2_edges, radius=FILLET_2_R)


solid = part.part
